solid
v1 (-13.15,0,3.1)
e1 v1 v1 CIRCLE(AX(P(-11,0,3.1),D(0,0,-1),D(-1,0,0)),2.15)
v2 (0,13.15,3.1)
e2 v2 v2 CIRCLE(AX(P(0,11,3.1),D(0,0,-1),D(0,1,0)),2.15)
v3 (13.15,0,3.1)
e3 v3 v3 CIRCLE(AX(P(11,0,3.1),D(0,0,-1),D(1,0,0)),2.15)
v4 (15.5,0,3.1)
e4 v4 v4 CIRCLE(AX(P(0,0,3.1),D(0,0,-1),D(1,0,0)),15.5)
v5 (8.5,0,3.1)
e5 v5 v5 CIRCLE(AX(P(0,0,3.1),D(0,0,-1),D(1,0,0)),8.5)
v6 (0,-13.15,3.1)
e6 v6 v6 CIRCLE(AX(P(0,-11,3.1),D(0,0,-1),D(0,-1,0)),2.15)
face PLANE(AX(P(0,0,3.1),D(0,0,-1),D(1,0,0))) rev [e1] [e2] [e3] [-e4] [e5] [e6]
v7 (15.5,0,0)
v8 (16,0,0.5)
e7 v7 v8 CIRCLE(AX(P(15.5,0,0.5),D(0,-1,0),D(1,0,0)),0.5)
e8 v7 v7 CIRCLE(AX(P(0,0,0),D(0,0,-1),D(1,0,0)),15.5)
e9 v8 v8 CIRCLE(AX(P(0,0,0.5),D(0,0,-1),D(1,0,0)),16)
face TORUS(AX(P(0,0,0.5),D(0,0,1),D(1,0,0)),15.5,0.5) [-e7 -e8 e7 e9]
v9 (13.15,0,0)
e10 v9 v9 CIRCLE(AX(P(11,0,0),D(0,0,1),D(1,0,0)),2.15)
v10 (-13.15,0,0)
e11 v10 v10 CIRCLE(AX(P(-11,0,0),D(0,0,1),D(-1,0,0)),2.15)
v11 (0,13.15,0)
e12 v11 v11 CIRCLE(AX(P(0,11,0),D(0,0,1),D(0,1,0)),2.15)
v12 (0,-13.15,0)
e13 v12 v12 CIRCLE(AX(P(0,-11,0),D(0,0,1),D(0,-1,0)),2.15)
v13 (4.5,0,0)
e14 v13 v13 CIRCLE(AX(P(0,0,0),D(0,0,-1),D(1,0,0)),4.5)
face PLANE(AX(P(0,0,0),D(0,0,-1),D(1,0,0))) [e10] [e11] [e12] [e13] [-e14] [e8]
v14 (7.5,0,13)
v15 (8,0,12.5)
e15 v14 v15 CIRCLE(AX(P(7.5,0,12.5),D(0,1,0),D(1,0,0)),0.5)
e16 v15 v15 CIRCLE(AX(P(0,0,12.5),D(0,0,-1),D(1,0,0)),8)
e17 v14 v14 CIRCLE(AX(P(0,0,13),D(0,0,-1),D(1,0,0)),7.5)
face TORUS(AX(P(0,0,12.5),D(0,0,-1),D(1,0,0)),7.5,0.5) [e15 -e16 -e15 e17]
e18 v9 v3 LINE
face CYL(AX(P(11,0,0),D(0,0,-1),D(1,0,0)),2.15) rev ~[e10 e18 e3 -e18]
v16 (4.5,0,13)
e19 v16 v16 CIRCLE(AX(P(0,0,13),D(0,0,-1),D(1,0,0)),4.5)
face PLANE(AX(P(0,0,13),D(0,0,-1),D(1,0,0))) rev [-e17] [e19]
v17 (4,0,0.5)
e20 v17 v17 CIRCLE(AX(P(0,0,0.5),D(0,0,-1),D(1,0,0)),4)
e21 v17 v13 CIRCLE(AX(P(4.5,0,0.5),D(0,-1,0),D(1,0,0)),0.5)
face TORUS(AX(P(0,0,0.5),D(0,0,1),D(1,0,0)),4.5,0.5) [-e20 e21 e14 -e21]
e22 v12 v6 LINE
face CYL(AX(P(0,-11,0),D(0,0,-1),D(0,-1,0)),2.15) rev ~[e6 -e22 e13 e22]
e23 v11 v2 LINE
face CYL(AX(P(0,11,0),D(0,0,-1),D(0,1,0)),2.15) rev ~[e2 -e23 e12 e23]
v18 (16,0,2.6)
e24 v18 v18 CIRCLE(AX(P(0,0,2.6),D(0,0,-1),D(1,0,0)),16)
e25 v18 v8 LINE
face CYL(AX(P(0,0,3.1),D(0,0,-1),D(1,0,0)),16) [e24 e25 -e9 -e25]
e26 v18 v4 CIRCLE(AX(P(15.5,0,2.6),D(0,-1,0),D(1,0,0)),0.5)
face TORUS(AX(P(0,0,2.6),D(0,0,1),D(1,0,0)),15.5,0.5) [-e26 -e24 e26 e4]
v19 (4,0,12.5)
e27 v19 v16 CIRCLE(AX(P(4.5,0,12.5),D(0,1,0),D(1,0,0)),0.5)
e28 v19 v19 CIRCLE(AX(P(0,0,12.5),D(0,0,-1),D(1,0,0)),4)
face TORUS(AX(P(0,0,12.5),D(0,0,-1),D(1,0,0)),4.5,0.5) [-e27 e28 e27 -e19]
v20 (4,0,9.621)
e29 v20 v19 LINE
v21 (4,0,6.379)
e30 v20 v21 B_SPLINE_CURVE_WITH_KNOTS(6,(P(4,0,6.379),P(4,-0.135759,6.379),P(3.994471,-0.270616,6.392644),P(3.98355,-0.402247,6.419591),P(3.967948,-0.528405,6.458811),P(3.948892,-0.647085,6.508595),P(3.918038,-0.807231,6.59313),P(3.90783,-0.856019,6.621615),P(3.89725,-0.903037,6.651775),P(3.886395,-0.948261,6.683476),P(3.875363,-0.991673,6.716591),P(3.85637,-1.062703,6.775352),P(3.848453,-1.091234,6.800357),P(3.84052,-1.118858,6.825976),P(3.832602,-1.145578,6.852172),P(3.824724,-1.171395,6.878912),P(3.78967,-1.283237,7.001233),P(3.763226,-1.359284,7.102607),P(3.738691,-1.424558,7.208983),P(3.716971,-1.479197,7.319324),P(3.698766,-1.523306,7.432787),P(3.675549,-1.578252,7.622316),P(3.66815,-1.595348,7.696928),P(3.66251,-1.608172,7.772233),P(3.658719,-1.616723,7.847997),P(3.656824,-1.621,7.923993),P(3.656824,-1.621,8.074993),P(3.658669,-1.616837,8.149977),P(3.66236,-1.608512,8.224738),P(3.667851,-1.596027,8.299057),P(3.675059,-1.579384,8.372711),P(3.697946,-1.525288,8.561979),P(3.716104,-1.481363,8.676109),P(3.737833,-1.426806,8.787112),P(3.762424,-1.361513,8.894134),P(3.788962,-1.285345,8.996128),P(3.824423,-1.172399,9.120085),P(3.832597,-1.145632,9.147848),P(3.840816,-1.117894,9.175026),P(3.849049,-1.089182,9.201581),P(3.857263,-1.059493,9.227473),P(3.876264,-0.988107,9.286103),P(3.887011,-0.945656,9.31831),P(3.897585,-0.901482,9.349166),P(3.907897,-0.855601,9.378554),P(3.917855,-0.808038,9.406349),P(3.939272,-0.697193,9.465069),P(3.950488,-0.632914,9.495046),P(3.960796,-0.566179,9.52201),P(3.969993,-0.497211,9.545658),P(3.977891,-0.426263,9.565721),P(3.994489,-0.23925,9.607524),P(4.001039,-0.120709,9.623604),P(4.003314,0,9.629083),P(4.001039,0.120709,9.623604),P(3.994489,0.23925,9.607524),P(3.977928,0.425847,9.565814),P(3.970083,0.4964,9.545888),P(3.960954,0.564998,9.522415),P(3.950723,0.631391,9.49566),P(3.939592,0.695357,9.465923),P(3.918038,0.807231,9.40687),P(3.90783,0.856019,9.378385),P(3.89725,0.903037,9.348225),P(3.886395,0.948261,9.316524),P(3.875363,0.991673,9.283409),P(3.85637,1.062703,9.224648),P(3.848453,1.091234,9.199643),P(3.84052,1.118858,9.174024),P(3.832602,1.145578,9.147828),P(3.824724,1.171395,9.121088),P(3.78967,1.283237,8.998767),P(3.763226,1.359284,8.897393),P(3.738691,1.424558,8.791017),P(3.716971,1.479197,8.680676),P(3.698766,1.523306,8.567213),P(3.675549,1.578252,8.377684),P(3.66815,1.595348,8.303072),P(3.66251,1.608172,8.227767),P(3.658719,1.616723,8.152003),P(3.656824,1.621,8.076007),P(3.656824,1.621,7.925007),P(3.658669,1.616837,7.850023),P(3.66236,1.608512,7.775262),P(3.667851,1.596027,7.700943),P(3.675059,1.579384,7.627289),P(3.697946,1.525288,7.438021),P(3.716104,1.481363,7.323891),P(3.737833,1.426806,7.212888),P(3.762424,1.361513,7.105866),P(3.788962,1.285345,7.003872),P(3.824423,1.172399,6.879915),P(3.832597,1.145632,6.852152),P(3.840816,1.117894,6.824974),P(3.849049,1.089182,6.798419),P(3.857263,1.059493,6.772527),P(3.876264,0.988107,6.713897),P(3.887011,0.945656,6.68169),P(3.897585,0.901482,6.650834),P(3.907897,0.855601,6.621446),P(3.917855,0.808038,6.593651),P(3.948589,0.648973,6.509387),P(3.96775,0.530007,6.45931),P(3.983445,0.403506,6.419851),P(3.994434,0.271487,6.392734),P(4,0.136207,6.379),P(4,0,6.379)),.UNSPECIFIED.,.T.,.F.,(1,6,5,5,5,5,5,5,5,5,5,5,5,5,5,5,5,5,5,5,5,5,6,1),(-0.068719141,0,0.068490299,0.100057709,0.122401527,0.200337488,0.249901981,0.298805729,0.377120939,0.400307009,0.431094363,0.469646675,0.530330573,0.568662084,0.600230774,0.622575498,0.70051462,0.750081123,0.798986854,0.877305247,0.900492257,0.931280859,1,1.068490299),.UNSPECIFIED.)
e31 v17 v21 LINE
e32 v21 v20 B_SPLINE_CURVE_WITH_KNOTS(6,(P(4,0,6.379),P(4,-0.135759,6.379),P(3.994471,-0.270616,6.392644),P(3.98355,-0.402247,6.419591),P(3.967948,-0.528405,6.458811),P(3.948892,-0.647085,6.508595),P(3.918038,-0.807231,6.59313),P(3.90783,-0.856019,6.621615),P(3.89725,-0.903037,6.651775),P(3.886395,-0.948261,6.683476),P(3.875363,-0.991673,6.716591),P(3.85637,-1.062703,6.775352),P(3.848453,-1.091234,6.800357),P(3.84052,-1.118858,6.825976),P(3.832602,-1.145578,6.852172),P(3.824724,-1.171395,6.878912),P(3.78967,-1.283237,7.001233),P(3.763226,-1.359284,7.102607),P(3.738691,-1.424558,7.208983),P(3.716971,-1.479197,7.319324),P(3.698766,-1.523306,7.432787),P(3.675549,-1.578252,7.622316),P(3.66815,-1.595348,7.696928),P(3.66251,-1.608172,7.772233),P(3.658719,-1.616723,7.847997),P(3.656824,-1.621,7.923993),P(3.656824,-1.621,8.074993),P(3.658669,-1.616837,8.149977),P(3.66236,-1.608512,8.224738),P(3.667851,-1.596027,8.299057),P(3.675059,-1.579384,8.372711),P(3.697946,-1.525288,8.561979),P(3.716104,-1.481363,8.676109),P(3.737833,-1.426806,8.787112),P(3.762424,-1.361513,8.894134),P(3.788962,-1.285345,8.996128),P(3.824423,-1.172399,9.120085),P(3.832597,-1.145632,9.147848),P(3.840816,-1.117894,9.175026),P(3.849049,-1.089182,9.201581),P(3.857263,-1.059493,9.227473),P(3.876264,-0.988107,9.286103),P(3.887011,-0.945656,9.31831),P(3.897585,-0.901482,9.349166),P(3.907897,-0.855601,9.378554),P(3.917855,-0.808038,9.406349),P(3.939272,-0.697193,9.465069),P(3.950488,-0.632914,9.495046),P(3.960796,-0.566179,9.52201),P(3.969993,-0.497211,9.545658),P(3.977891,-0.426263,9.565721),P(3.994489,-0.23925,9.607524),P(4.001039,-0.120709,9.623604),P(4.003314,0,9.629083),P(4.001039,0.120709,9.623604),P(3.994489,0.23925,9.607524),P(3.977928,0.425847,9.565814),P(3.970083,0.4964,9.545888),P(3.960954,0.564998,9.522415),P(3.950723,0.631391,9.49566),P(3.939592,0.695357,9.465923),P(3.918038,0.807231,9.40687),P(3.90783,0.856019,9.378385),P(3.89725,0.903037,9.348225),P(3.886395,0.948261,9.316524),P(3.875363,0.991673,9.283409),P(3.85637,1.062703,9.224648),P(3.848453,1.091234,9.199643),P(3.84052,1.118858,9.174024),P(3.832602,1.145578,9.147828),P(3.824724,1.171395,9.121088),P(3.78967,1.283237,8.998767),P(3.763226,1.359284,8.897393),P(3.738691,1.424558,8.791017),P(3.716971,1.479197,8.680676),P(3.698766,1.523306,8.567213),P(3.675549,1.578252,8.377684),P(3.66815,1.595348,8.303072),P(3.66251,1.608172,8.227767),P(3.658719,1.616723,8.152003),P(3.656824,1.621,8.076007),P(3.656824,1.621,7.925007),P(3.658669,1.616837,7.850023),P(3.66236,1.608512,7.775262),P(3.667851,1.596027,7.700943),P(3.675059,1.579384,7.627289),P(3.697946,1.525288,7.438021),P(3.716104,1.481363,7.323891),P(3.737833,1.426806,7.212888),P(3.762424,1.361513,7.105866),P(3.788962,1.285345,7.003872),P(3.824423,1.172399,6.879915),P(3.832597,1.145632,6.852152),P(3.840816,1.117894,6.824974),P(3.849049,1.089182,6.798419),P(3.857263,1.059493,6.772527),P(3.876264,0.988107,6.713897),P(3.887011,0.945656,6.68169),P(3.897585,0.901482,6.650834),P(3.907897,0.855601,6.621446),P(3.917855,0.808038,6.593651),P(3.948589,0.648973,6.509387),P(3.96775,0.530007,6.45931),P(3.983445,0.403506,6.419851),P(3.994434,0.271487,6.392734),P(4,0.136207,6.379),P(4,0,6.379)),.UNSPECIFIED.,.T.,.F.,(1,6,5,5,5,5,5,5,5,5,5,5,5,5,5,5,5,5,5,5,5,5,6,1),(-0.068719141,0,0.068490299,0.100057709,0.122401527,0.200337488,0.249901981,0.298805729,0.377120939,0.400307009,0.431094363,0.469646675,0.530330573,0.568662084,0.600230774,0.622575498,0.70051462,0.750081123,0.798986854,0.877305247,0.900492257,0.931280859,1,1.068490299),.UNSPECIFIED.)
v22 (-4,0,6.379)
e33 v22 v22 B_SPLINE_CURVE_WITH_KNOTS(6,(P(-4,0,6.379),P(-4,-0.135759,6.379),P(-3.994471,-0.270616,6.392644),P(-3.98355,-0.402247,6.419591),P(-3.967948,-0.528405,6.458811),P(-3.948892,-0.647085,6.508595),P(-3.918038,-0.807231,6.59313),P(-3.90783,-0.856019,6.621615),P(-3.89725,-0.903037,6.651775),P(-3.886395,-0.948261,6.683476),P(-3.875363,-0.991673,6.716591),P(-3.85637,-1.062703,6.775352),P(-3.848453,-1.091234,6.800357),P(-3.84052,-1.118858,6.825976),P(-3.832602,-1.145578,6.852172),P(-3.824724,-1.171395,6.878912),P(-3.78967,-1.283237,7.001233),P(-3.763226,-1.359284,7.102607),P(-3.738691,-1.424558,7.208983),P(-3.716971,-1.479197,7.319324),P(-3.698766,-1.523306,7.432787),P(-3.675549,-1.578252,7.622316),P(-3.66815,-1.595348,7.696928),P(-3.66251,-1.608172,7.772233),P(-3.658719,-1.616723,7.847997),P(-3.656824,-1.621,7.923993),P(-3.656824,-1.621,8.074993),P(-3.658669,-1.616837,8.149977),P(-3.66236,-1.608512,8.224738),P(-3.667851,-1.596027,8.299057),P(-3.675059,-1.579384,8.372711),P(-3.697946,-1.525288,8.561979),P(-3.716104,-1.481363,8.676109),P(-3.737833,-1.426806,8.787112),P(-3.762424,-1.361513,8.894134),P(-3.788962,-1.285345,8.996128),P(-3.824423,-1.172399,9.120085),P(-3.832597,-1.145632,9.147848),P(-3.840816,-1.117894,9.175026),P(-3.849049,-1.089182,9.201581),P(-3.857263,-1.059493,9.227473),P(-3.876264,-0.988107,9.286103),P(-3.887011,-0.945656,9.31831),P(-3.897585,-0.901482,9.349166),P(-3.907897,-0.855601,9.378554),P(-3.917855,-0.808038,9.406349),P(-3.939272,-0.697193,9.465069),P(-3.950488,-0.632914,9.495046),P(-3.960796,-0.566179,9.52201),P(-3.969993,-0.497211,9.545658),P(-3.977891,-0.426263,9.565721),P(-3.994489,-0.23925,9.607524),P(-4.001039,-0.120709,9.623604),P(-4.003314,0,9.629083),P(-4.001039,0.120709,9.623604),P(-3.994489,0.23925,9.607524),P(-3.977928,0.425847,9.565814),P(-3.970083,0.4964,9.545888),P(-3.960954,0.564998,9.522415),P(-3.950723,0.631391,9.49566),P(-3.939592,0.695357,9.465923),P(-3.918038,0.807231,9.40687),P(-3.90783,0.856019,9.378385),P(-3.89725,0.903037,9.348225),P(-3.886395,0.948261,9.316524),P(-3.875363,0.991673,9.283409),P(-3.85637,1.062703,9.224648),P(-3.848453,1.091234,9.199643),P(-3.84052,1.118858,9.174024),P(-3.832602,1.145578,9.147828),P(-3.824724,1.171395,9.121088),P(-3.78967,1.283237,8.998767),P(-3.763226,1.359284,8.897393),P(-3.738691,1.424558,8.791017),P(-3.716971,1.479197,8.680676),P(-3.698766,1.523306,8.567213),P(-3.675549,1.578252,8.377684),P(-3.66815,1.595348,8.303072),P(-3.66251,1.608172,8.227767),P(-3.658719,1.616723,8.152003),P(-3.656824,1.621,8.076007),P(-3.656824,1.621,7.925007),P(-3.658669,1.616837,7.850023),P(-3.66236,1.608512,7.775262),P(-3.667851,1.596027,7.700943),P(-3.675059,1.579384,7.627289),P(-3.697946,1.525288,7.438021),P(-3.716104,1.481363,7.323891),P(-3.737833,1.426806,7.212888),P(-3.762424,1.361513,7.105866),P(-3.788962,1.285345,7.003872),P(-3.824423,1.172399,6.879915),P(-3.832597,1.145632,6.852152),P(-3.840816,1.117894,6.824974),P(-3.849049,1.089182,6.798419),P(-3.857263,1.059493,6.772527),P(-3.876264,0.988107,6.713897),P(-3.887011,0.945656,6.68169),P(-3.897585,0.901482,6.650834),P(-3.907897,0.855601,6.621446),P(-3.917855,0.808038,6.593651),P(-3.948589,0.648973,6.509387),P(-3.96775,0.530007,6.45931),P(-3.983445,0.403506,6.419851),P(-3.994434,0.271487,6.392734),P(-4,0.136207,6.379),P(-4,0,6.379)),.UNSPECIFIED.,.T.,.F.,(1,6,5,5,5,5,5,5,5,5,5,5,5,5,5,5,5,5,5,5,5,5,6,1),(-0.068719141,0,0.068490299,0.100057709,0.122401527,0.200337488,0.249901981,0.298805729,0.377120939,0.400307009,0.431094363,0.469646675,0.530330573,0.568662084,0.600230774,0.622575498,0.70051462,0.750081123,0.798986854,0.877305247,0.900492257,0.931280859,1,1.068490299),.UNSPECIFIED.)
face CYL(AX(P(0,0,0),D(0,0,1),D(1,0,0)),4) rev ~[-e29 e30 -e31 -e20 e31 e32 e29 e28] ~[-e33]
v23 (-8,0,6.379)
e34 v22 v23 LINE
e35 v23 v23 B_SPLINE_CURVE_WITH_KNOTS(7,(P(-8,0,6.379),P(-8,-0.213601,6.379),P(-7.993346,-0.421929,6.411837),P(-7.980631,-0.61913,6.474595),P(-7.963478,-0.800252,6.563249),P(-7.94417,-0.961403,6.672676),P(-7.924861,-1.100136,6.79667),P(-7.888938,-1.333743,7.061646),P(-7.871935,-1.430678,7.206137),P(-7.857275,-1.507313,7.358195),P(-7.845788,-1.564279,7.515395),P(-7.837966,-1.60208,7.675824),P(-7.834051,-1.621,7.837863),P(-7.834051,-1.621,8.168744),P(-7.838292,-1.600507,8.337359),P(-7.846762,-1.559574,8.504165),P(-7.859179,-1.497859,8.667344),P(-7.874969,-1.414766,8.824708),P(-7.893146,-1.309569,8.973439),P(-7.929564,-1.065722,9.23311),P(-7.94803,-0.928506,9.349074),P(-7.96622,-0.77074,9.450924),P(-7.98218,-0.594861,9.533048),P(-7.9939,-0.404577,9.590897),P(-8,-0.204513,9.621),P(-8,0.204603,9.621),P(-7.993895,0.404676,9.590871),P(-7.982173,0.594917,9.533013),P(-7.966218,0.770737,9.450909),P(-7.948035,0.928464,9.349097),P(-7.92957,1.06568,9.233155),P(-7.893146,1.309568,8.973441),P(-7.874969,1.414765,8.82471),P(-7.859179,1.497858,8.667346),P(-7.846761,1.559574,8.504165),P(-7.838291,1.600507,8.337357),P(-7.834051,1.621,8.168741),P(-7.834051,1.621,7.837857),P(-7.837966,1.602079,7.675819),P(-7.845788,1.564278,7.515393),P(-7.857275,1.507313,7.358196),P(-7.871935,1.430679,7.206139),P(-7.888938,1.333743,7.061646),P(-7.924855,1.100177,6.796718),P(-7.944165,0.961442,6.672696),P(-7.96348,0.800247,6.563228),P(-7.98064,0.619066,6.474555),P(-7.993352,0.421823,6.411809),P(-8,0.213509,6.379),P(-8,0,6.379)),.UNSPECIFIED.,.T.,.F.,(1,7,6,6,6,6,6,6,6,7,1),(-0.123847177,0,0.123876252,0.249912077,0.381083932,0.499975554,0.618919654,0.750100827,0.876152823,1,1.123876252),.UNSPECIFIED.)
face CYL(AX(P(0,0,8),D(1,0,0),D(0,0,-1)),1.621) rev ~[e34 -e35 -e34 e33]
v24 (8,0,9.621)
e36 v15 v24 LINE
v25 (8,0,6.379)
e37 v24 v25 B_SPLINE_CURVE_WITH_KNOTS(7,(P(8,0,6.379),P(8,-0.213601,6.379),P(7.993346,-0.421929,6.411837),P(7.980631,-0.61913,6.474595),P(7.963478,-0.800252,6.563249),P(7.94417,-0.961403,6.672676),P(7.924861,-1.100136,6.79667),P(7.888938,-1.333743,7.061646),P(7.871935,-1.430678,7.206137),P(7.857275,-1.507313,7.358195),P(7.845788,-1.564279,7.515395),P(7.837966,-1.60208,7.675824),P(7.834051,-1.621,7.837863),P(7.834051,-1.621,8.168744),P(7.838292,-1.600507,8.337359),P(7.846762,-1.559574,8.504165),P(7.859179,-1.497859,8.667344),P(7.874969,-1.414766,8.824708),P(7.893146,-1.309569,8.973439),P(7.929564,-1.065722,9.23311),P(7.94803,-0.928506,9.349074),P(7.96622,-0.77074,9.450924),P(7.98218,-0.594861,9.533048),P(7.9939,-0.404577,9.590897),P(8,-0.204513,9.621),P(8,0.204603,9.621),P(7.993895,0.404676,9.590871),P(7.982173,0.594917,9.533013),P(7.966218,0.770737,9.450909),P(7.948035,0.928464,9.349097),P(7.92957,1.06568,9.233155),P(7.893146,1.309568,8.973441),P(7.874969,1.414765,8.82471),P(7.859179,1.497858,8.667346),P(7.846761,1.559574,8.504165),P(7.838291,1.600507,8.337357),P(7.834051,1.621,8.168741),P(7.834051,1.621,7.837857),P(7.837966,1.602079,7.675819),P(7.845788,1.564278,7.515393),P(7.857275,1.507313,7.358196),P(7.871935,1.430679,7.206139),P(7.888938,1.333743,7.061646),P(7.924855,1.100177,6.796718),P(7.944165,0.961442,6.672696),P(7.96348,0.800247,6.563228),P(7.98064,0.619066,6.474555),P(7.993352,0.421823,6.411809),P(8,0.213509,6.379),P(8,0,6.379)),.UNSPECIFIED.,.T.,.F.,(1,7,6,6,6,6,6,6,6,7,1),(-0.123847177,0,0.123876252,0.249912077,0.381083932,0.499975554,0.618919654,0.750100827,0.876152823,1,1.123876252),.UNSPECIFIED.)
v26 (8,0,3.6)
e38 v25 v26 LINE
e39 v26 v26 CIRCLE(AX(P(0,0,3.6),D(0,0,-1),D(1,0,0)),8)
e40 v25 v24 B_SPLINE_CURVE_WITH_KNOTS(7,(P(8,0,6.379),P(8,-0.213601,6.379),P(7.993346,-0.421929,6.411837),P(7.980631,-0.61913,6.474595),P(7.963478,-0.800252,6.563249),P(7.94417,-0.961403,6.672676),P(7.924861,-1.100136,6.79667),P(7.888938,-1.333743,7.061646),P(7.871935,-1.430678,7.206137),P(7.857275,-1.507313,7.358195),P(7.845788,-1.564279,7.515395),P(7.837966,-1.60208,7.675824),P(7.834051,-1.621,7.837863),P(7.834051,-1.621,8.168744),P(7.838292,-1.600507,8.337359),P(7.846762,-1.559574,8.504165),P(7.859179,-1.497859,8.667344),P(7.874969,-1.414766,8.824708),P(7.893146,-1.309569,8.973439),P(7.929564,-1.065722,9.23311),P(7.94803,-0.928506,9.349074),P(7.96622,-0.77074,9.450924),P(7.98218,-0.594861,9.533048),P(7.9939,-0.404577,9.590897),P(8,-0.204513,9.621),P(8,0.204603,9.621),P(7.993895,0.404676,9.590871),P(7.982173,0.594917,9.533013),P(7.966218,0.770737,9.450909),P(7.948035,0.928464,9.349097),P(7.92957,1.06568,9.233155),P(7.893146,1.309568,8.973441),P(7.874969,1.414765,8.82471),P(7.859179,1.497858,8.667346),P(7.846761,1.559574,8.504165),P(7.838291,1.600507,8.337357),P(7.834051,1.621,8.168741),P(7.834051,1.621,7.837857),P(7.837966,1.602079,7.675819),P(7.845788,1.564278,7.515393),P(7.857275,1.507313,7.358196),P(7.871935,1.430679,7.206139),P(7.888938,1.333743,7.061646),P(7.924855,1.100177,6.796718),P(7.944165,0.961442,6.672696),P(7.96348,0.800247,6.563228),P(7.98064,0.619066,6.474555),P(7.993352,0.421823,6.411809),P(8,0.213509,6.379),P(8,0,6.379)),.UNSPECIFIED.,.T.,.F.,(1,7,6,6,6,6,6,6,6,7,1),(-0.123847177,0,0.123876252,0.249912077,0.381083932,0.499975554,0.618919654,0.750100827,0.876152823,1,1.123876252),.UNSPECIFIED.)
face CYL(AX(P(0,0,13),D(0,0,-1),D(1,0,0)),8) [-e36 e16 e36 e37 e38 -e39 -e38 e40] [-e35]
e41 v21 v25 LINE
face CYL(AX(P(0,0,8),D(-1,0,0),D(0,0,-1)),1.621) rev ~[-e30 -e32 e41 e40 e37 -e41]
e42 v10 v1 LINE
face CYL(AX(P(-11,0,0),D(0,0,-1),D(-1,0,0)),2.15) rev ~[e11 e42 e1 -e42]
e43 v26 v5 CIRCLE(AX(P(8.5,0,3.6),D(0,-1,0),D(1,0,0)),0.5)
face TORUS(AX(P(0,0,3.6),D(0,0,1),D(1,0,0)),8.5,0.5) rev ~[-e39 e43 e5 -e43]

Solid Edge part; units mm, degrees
sketch "Sketch1" plane through (0, 0, 0) normal (0, -1, 0) x (1, 0, 0)
  line L0 (4, 0) -> (4, 13)
  line L1 (4, 13) -> (8, 13)
  line L2 (8, 13) -> (8, 3.1)
  line L3 (8, 3.1) -> (16, 3.1)
  line L4 (16, 3.1) -> (16, 0)
  line L5 (16, 0) -> (4, 0)
  dimension "D1" = 3.1
  dimension "D2" = 13
revolve "RevolvedProtrusion1" add sketch "Sketch1" angle 360 about axis through (0, 0, 54) along (0, 0, -1)
hole "Hole_1" at (0, 11, 0) direction (0, 0, 1) diameter 4.3 end up to next
pattern_circular "Pattern1" count 4 over 360 about axis through (0, 0, 3.1) along (0, 0, 1) of "Hole_1"
fillet "Round1" radius 0.5 6 edges at (-8, 0, 13) (-4, 0, 13) (-8, 0, 3.1) (-16, 0, 3.1) (-16, 0, 0) (-4, 0, 0)
hole "Hole_2" at (0, 0, 8) direction (-1, 0, 0) diameter 3.242 end up to next
mirror "Mirror1" about plane through (0, 0, 0) normal (1, 0, 0) of "Hole_2"
properties material "X5CrNi18-8"
